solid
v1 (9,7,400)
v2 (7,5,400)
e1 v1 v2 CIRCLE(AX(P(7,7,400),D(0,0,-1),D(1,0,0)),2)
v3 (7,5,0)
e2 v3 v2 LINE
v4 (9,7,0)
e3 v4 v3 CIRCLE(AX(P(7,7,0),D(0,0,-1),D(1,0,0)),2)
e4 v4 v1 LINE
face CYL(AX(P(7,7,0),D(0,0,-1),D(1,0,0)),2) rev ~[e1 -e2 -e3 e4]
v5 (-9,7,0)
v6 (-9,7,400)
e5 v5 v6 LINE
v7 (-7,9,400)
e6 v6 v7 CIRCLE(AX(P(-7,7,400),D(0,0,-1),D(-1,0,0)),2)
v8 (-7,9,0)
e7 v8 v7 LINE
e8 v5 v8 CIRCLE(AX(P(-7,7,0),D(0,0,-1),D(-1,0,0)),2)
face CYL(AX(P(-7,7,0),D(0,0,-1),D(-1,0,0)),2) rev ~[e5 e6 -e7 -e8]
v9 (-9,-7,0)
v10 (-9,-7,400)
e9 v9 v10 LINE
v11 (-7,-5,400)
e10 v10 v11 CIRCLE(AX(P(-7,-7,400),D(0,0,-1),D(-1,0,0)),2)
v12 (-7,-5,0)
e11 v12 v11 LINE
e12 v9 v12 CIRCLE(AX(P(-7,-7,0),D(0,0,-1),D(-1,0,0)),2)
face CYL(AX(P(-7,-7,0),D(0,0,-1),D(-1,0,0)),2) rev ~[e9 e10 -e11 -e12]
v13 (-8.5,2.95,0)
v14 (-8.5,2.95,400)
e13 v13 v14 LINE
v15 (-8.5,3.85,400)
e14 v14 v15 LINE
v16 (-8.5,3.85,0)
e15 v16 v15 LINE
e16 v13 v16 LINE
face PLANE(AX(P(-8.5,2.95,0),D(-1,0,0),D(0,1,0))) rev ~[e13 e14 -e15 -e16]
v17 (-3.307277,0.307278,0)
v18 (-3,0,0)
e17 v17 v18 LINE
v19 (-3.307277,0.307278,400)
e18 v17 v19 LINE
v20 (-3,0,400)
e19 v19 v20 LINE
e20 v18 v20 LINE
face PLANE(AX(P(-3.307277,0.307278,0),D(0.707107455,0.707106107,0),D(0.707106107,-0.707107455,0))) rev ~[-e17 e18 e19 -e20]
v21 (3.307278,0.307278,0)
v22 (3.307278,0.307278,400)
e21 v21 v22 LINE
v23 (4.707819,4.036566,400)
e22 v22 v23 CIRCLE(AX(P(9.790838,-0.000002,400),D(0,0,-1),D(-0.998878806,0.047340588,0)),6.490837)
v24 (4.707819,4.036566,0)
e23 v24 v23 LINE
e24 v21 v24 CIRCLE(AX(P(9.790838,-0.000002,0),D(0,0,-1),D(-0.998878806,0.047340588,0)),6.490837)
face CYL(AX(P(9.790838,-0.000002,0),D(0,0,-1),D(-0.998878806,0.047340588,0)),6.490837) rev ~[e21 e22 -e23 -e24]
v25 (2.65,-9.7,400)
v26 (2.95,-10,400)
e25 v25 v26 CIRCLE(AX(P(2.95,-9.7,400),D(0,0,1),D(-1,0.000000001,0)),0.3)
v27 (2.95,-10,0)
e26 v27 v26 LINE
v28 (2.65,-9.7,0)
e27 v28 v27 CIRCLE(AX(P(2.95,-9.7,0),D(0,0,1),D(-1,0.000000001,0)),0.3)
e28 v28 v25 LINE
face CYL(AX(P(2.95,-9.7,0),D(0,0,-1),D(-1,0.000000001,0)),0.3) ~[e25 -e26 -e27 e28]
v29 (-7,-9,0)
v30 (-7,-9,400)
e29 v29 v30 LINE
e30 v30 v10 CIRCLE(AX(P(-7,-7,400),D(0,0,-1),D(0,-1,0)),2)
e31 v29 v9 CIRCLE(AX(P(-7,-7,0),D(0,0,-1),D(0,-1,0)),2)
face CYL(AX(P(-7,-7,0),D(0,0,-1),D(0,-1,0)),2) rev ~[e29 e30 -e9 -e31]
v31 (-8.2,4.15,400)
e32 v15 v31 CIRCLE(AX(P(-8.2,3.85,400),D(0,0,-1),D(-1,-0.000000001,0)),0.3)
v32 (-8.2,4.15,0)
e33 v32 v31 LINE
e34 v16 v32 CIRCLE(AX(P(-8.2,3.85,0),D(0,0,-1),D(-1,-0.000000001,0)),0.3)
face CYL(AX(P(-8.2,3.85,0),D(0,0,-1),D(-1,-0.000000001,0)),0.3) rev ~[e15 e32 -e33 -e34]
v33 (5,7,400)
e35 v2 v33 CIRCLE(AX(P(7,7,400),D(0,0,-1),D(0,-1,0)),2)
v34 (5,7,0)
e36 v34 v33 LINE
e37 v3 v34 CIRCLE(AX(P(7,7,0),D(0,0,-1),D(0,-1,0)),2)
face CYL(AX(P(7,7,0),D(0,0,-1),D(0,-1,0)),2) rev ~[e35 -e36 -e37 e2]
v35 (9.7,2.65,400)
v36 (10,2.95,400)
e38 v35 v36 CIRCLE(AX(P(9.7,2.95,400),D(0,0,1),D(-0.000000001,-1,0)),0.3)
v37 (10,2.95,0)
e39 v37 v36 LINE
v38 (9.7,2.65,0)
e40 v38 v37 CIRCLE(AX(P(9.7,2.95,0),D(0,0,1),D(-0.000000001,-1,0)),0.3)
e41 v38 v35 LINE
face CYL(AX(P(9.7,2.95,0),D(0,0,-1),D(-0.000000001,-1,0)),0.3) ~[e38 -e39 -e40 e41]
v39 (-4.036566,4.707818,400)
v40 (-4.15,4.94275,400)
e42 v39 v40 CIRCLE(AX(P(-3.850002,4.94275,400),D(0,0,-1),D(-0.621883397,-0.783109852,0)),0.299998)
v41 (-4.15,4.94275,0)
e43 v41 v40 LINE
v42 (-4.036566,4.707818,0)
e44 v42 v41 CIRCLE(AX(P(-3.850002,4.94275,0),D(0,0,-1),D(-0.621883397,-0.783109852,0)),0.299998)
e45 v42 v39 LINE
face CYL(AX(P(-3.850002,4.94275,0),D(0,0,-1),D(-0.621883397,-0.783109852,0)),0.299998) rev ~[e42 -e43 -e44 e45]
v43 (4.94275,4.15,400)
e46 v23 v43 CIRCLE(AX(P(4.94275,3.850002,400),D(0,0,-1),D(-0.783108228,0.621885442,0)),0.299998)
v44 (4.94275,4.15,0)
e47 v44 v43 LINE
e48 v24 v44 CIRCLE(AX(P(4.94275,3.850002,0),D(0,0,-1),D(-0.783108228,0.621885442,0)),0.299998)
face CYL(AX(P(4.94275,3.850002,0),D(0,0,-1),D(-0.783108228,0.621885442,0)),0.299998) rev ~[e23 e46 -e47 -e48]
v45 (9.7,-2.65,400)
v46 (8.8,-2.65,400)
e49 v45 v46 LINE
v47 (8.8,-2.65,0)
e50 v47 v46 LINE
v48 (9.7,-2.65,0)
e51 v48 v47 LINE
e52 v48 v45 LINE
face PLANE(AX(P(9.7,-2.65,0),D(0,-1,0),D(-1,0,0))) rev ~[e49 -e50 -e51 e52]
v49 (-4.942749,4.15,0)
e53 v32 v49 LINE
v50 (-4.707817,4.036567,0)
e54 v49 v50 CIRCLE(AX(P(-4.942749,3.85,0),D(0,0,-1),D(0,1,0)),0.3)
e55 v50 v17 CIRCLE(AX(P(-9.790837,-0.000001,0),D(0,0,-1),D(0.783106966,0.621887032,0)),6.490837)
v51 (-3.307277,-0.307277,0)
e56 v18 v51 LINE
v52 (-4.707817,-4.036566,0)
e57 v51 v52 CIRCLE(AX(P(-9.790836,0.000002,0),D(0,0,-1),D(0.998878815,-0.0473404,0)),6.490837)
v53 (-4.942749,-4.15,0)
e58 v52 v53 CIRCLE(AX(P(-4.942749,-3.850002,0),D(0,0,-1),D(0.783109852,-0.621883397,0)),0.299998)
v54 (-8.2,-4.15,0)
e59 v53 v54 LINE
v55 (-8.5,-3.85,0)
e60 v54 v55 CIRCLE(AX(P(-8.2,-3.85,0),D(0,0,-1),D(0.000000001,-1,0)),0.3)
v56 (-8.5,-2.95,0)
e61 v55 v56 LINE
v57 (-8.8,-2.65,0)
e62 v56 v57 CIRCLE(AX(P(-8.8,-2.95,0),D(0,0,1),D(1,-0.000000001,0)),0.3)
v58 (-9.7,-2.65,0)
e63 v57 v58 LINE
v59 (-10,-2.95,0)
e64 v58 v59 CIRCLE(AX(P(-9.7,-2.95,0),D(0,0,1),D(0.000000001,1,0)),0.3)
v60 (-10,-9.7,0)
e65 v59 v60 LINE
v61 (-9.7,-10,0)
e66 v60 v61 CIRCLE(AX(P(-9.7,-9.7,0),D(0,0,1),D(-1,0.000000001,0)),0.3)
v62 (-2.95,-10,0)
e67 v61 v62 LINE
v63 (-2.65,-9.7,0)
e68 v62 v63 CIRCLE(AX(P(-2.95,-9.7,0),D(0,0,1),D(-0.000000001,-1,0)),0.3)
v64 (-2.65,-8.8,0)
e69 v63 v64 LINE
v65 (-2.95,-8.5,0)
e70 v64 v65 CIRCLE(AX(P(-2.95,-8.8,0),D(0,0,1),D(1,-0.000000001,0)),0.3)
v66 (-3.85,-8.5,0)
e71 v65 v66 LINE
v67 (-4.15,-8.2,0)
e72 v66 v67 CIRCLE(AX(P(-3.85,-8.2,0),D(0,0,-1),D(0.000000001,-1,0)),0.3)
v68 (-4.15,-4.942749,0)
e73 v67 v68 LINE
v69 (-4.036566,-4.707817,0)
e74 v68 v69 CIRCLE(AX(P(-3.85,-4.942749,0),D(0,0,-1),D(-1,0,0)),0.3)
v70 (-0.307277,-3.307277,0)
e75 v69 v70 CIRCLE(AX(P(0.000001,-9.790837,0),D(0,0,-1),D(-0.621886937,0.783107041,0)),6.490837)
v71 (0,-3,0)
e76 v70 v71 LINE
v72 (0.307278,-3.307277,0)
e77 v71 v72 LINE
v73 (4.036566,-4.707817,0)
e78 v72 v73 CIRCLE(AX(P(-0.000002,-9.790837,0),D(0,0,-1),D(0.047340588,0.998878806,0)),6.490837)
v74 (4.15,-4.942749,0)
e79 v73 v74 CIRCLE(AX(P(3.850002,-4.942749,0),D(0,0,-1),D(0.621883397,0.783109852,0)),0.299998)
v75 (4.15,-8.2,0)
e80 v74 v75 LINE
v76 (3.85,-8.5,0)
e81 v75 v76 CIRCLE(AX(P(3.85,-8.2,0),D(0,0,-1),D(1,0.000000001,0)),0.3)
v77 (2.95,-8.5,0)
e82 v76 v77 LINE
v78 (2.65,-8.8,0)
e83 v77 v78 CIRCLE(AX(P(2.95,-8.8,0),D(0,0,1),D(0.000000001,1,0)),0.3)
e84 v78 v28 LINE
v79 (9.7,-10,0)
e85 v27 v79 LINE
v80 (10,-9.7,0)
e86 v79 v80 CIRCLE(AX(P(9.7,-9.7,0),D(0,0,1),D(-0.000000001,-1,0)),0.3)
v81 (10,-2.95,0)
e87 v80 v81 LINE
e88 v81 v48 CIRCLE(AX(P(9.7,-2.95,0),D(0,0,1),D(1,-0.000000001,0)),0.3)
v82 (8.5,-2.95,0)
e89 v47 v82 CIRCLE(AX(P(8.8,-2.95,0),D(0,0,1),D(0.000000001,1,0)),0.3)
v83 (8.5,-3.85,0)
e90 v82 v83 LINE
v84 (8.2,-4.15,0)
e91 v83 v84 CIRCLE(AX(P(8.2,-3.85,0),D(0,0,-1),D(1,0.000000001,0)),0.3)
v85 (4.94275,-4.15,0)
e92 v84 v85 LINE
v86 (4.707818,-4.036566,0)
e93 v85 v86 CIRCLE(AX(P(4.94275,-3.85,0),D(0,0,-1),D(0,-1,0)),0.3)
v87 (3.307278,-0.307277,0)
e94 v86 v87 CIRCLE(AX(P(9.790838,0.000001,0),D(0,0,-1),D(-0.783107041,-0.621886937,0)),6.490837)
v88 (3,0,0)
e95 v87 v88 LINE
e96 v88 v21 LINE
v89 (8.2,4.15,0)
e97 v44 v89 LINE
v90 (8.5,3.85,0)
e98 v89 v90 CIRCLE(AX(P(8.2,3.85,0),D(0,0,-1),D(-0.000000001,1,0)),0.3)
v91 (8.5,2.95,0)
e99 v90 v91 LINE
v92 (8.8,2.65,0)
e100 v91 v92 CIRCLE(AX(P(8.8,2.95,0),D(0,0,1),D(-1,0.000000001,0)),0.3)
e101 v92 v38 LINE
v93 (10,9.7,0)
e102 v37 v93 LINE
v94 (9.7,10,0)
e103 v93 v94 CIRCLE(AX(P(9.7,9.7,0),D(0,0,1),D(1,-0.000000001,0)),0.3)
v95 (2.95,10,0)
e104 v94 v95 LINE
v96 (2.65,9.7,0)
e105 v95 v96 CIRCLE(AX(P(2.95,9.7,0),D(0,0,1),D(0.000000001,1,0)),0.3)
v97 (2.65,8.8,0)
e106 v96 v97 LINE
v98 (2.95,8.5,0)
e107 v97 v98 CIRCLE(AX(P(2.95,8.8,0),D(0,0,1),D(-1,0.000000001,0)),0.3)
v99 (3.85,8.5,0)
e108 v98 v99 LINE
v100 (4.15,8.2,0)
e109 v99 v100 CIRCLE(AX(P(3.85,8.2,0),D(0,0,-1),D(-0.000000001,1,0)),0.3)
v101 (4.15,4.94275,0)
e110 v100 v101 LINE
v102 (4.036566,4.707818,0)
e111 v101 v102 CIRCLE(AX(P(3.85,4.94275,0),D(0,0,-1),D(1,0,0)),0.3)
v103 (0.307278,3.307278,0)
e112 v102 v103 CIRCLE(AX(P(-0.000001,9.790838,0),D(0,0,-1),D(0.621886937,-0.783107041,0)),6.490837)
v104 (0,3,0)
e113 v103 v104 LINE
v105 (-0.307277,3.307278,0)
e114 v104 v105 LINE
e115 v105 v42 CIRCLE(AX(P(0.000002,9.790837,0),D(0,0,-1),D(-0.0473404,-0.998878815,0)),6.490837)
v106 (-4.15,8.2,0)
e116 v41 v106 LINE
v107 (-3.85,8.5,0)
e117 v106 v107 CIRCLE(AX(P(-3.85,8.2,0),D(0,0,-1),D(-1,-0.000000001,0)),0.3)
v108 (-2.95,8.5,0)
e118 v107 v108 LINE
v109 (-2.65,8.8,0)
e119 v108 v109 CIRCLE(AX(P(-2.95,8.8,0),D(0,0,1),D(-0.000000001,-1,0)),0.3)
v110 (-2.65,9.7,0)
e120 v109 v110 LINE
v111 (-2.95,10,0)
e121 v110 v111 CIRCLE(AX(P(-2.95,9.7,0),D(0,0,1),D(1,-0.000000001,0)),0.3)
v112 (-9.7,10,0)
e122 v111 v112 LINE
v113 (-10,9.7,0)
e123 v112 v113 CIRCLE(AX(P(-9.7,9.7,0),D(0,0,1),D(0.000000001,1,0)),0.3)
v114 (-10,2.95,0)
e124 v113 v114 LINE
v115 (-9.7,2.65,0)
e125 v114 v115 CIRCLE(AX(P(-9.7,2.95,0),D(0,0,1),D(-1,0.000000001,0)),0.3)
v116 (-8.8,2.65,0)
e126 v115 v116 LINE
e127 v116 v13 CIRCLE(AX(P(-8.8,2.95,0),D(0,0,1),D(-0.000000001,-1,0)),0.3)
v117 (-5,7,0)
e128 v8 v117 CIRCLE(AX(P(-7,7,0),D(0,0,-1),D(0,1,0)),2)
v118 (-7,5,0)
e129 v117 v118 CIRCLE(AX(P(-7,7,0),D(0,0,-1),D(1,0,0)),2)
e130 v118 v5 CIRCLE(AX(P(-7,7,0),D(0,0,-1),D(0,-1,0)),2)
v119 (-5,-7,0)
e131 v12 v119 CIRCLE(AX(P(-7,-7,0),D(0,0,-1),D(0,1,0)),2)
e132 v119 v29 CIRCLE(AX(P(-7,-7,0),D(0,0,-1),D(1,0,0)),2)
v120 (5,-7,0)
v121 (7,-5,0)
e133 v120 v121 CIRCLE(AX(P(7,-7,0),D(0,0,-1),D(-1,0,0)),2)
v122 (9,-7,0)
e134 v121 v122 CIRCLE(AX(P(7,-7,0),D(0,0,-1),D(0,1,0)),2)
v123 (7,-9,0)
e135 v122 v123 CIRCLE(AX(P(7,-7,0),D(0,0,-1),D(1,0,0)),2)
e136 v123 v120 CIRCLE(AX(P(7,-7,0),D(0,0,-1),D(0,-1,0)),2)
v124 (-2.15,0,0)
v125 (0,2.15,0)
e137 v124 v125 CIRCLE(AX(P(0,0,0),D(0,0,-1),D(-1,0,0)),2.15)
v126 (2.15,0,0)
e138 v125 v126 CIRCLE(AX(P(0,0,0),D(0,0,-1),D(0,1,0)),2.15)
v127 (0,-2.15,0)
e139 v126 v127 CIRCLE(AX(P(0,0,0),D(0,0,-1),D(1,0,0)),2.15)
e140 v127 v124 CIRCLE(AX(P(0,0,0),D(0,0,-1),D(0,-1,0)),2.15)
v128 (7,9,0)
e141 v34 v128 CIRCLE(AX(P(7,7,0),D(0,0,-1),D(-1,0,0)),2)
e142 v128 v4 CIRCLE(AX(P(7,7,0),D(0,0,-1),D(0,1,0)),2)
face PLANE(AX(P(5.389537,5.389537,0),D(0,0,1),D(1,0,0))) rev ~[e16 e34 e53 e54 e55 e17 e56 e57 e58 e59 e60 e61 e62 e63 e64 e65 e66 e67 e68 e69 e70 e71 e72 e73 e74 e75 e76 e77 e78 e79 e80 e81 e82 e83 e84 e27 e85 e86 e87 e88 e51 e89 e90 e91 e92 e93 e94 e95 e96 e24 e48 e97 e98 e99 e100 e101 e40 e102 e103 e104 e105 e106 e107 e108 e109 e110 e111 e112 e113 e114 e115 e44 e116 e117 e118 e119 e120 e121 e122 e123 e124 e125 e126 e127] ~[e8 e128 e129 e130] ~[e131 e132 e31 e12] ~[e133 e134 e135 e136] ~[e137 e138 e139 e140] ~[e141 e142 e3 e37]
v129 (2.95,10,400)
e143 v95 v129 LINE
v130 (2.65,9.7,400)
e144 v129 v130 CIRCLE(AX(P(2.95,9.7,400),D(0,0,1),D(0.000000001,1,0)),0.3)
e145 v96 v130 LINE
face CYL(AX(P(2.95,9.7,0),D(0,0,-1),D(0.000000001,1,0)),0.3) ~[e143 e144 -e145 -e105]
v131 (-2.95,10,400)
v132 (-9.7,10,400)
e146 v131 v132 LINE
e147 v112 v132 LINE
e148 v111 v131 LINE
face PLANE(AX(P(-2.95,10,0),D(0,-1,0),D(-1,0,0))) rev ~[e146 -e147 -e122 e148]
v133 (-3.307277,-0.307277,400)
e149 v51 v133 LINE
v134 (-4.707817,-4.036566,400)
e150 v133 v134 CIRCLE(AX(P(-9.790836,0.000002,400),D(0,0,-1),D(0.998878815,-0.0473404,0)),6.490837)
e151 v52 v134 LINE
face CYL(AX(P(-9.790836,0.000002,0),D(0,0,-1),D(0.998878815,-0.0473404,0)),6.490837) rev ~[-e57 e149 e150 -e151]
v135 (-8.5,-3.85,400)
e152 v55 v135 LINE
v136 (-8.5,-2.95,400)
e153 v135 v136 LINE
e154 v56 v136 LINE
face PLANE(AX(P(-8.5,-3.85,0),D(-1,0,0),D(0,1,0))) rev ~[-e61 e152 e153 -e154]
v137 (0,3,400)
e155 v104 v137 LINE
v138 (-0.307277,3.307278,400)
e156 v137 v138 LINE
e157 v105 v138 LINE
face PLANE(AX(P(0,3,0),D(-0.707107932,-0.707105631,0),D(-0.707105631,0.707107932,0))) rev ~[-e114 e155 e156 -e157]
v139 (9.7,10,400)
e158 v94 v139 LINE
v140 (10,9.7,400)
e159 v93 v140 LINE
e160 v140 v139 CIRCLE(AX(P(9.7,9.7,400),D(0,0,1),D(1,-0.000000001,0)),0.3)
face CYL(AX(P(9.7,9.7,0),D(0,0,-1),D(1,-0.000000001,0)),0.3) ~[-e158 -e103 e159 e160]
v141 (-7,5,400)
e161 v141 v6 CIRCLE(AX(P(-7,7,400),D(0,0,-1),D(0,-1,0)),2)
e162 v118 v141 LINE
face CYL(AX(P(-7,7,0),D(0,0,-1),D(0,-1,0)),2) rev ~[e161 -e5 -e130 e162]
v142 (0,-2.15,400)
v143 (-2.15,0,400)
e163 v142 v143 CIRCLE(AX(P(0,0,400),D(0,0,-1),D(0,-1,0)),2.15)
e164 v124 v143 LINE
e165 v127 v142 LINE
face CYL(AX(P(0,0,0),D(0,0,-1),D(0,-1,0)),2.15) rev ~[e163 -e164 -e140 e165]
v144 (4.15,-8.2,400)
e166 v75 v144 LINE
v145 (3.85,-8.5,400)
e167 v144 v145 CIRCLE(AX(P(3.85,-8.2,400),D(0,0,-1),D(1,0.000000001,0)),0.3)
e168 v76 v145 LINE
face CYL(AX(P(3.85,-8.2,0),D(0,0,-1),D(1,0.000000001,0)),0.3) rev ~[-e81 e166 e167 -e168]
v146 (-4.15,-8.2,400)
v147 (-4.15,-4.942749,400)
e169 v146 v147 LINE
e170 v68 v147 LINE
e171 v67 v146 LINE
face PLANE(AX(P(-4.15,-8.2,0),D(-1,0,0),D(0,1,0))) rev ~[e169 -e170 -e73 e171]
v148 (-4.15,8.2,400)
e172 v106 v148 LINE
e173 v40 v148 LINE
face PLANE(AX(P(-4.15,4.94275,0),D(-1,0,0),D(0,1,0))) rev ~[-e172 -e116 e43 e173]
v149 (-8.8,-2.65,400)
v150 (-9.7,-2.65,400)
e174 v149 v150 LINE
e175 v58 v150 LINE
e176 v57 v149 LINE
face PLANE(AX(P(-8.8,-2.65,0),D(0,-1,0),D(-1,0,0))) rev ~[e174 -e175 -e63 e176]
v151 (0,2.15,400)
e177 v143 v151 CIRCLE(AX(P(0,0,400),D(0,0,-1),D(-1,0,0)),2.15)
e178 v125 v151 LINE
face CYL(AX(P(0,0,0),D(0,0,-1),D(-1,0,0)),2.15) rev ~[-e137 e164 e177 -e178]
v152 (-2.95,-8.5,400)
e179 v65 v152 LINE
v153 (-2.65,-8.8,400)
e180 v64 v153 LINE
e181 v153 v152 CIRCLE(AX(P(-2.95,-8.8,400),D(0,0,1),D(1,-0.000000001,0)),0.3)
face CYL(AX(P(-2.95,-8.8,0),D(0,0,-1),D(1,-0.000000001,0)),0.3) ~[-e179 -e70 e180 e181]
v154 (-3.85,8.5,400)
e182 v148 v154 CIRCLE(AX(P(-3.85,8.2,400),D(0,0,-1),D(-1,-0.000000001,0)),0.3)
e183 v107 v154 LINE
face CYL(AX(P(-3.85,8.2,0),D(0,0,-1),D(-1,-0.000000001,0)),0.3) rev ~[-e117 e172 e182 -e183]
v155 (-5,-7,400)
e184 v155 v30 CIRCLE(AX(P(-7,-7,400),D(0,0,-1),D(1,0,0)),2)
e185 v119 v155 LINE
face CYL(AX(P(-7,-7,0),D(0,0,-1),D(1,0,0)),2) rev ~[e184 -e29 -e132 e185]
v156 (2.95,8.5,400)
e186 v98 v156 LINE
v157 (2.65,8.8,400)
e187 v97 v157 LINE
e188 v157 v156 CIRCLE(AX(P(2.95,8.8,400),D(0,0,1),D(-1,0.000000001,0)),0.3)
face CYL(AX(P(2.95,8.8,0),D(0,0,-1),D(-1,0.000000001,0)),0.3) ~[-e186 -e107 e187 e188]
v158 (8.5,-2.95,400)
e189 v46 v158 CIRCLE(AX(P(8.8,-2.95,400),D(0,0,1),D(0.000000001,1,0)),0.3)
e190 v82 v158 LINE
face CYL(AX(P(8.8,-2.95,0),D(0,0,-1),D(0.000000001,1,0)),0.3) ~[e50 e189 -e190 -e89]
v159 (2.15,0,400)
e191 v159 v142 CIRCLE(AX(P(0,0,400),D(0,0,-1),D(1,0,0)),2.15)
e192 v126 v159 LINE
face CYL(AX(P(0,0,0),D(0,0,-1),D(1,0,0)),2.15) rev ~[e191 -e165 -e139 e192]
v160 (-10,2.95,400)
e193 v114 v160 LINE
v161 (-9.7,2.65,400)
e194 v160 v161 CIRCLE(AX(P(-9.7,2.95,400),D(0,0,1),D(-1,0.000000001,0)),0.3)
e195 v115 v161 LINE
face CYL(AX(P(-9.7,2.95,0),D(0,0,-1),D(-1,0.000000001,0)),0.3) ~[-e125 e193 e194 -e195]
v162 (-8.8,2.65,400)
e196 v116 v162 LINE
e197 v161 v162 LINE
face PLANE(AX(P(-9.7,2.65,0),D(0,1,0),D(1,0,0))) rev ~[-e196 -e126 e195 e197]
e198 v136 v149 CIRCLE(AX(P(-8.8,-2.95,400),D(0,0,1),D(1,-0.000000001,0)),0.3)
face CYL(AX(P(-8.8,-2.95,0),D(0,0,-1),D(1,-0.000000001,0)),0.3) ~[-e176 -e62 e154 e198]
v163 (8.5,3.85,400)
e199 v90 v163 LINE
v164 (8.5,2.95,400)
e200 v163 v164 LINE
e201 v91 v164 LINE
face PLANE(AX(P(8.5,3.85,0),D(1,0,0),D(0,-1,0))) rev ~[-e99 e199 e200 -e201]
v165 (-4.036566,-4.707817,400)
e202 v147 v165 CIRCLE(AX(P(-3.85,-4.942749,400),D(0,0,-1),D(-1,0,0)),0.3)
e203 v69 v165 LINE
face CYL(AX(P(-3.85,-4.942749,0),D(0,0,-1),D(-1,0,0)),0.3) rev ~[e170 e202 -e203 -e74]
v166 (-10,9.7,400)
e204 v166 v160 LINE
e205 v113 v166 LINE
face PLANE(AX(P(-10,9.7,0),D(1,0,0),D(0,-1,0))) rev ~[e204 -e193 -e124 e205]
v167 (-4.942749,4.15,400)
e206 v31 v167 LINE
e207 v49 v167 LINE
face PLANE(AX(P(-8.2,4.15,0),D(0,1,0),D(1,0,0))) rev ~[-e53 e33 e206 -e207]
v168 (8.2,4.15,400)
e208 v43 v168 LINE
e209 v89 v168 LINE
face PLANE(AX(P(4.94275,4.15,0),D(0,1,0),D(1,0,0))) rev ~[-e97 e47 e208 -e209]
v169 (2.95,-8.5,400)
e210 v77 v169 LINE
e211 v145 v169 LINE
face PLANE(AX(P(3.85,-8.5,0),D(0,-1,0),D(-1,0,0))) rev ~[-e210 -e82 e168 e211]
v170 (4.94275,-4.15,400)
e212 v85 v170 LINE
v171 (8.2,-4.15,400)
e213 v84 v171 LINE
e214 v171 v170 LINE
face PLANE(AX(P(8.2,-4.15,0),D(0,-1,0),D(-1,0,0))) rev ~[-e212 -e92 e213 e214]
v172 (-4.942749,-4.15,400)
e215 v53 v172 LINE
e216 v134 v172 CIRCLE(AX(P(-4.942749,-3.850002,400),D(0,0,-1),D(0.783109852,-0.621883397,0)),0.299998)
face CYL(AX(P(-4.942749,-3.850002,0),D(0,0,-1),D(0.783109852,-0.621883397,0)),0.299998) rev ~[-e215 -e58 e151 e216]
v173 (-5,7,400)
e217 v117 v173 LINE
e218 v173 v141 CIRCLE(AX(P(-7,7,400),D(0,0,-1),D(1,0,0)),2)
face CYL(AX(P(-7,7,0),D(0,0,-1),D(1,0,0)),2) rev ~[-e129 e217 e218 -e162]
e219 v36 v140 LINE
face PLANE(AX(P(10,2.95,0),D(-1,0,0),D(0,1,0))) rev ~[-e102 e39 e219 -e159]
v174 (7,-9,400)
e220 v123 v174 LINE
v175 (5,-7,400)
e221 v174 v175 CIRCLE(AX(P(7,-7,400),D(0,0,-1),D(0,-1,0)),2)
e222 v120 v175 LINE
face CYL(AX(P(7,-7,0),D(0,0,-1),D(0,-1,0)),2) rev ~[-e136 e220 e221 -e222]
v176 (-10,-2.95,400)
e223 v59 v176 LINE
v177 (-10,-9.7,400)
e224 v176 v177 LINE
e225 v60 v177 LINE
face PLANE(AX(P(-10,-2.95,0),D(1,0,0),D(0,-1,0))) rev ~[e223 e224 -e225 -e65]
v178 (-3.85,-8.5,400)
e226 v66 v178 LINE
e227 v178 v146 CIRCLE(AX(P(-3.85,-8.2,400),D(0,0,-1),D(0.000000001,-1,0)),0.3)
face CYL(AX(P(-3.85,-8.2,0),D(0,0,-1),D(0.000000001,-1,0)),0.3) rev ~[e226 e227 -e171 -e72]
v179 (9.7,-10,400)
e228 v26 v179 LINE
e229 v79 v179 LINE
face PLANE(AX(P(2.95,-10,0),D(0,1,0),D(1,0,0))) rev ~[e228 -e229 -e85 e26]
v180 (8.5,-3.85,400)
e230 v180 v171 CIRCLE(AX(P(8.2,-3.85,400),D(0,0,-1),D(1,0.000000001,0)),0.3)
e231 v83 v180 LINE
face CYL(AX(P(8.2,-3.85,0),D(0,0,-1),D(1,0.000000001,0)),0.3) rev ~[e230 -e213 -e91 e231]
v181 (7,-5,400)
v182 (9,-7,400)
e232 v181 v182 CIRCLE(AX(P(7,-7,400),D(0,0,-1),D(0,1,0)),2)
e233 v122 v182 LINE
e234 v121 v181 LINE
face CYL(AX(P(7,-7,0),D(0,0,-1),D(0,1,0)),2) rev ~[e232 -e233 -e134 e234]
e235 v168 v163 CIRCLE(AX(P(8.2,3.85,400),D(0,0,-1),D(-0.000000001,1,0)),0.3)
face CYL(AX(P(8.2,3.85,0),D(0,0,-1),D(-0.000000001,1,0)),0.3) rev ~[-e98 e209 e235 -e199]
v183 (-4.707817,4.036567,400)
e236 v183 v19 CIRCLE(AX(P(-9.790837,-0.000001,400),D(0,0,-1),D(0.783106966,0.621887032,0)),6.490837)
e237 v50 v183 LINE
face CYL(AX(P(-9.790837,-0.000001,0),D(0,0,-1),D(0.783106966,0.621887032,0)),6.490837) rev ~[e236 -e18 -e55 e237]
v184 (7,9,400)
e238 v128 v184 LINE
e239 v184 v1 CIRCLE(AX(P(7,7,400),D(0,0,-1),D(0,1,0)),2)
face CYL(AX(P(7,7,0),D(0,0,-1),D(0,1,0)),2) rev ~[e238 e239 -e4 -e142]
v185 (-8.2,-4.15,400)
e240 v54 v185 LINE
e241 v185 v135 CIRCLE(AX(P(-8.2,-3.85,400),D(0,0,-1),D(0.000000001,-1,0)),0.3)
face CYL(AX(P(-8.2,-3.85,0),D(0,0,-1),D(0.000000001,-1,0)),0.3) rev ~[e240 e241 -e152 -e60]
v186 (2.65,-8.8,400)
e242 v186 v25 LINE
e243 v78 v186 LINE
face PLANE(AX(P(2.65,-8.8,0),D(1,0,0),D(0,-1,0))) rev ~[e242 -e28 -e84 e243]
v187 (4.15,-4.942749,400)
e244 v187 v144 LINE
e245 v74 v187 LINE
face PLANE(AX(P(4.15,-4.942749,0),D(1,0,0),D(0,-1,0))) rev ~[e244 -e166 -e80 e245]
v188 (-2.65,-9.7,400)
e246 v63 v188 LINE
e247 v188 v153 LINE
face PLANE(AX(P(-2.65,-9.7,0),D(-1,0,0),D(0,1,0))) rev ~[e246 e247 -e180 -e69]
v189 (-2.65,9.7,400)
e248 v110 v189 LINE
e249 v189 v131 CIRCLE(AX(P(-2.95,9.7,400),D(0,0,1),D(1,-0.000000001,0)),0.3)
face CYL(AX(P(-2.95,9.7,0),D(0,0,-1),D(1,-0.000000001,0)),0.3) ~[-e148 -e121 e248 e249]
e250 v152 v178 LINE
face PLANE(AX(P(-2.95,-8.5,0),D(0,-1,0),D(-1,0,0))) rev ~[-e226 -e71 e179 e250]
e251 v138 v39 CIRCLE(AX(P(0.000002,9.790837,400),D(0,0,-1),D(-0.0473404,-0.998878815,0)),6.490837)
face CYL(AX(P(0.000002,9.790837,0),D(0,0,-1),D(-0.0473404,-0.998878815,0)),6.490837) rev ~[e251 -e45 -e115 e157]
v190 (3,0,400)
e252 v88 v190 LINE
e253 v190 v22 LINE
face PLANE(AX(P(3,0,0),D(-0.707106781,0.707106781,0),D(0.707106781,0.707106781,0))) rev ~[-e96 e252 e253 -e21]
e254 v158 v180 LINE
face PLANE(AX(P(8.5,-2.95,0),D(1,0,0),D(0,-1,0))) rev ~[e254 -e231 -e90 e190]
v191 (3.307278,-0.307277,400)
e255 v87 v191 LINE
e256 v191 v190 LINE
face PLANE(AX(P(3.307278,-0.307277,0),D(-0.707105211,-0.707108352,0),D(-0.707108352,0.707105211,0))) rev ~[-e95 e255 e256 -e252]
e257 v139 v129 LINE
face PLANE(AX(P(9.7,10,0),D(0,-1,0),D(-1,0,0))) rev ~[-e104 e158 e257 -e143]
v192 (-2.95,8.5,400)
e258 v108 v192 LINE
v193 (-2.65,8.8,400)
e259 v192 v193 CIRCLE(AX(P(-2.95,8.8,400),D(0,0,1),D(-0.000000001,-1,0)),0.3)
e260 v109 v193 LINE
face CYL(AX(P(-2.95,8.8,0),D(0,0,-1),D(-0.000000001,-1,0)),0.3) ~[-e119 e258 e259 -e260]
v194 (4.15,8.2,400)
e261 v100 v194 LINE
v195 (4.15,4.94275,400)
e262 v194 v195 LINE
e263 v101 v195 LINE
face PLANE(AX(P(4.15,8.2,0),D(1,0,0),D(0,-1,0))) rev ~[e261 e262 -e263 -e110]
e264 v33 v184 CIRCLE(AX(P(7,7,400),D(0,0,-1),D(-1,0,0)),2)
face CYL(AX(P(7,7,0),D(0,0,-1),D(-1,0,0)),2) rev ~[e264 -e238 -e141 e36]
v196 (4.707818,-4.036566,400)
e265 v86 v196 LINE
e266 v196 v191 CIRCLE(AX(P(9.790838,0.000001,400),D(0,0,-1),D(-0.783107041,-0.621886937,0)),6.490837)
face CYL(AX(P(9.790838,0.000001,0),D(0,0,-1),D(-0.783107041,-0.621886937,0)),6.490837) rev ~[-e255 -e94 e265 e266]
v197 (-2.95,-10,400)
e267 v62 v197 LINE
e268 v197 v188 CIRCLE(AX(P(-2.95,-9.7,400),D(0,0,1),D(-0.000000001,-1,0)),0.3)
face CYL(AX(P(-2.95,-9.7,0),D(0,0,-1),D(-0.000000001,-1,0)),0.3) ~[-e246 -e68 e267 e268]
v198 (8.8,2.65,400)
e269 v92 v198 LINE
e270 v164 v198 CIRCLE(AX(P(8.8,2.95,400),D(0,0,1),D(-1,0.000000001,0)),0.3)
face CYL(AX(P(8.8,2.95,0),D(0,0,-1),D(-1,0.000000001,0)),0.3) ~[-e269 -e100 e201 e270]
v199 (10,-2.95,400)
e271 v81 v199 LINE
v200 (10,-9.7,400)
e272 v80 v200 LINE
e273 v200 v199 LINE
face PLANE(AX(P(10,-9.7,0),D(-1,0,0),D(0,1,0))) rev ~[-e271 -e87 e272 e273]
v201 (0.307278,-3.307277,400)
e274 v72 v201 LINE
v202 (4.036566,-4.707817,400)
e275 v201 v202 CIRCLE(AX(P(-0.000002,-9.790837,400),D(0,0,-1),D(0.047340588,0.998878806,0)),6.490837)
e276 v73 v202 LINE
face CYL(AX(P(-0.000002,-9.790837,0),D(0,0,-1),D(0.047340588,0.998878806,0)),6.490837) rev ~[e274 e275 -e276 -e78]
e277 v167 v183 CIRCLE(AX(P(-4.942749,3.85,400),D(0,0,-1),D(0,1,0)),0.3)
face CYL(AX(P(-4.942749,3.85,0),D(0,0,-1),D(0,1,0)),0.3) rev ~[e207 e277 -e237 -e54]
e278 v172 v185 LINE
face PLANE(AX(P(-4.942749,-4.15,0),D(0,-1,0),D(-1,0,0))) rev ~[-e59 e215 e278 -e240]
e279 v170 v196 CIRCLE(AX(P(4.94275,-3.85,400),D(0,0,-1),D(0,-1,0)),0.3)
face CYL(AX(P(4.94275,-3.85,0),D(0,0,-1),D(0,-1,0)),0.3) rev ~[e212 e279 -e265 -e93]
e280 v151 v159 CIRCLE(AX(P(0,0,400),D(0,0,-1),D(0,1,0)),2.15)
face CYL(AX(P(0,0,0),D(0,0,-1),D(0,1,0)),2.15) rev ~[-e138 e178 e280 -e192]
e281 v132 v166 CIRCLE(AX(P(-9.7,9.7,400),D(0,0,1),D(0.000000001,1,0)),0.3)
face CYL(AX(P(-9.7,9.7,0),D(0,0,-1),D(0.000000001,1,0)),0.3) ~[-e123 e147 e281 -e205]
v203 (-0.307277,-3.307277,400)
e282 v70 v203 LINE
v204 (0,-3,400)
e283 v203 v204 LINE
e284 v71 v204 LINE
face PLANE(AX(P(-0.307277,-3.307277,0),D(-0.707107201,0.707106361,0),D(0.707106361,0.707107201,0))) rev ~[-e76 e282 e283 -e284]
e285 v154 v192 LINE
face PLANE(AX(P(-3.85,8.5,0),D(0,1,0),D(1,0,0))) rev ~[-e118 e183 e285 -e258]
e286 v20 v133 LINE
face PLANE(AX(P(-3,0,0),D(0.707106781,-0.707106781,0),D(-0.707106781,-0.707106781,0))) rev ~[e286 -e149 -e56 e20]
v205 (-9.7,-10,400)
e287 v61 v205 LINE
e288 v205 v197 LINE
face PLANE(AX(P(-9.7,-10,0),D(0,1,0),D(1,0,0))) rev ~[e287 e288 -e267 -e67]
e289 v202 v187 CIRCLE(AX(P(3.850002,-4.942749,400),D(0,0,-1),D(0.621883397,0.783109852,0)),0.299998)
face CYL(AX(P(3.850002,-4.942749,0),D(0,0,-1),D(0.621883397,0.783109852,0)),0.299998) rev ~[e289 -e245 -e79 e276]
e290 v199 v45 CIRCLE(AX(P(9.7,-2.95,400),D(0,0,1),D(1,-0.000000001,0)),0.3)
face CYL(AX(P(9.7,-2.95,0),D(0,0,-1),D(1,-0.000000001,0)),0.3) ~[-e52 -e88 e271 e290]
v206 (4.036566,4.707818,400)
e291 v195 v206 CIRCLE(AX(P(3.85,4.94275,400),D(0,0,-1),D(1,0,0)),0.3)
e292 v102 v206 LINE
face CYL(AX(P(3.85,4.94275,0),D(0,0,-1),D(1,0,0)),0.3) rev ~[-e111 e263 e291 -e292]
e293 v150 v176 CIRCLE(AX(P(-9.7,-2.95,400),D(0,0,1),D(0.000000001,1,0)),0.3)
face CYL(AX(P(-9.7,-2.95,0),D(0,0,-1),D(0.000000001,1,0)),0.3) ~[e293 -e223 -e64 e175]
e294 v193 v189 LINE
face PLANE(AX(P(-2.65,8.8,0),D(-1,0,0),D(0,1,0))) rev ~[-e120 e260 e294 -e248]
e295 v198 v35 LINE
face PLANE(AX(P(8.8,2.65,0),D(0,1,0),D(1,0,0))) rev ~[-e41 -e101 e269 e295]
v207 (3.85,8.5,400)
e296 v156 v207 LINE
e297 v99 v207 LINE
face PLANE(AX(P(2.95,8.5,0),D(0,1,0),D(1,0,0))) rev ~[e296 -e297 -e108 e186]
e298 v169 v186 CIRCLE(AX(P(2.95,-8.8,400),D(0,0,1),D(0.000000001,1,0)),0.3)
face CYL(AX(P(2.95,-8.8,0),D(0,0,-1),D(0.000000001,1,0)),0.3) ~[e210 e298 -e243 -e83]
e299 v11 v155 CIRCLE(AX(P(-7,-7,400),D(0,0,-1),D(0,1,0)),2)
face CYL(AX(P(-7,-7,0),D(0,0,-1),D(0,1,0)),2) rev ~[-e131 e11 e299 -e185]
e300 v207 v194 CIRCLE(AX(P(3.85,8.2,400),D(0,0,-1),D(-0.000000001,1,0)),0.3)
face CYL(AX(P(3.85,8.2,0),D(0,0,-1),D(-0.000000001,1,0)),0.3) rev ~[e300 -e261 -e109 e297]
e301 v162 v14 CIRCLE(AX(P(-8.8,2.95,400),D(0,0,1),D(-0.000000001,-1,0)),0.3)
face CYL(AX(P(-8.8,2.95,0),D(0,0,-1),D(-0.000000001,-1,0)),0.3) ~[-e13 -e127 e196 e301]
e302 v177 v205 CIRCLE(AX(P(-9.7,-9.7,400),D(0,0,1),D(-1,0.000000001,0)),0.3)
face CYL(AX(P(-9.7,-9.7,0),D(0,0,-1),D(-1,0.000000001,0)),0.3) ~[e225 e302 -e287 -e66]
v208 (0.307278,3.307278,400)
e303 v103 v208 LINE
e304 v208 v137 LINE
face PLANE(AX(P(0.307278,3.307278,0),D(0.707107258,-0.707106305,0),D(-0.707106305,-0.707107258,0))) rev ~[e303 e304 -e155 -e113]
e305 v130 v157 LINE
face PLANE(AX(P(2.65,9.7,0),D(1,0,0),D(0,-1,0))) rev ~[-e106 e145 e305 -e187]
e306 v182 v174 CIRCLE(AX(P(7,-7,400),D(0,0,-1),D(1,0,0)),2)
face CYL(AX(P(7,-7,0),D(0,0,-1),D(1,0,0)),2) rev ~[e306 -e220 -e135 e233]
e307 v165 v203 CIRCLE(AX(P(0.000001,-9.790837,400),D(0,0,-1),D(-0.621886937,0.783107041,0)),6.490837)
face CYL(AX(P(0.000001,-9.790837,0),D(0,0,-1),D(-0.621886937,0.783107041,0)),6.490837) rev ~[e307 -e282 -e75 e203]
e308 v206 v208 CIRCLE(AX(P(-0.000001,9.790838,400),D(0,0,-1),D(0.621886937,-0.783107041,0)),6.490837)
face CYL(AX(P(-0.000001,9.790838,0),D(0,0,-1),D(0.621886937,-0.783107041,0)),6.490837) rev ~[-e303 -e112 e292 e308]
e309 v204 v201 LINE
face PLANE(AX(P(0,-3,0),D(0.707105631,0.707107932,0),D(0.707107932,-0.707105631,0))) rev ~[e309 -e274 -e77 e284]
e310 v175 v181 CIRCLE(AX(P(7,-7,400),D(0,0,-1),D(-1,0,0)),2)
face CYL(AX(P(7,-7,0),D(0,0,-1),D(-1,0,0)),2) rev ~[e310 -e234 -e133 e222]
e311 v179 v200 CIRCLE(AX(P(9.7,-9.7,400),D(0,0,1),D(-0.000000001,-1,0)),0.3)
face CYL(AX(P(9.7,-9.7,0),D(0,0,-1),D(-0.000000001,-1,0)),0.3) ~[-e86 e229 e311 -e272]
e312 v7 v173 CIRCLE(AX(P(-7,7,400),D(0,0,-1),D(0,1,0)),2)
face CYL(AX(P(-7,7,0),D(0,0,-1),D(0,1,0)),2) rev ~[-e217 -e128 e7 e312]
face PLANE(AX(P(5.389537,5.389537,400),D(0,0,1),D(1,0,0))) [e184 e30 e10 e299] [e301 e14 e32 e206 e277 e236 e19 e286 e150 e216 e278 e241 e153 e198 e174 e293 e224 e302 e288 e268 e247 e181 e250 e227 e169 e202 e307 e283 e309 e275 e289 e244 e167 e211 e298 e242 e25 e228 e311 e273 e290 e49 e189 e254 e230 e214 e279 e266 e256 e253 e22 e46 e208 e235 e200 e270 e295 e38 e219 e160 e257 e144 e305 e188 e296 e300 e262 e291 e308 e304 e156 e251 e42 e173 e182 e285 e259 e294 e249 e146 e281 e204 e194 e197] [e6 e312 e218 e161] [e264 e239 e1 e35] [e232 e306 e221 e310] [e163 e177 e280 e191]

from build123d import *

# Parameters (mm, degrees)
F1_DEPTH = 400


# Not quite as in the source:
# - ends of sketch curves that miss each other by under 0.0002 mm in the source are joined


with BuildPart() as f1:
    # F0 (on Top) → F1 (new body)
    with BuildSketch(Plane.XY):
        with BuildLine():
            ThreePointArc((0, 2.15), (1.5202795796, 1.5202795796), (2.15, 0))
            Line((2.15, 0), (3, 0))
            Line((3, 0), (3.307278, 0.307278))
            ThreePointArc((3.307278, 0.307278), (3.7143803747, 2.2820219924), (4.7078187099, 4.0365664363))
            ThreePointArc((4.7078187099, 4.0365664363), (4.812308461, 4.1201573706), (4.94275, 4.15))
            Line((4.94275, 4.15), (8.2, 4.15))
            ThreePointArc((8.2, 4.15), (8.4121320344, 4.0621320344), (8.5, 3.85))
            Line((8.5, 3.85), (8.5, 2.95))
            ThreePointArc((8.5, 2.95), (8.5878679656, 2.7378679656), (8.8, 2.65))
            Line((8.8, 2.65), (9.7, 2.65))
            ThreePointArc((9.7, 2.65), (9.9121320344, 2.7378679656), (10, 2.95))
            Line((10, 2.95), (10, 9.7))
            ThreePointArc((10, 9.7), (9.9121320344, 9.9121320344), (9.7, 10))
            Line((9.7, 10), (2.95, 10))
            ThreePointArc((2.95, 10), (2.7378679656, 9.9121320344), (2.65, 9.7))
            Line((2.65, 9.7), (2.65, 8.8))
            ThreePointArc((2.65, 8.8), (2.7378679656, 8.5878679656), (2.95, 8.5))
            Line((2.95, 8.5), (3.85, 8.5))
            ThreePointArc((3.85, 8.5), (4.0621320344, 8.4121320344), (4.15, 8.2))
            Line((4.15, 8.2), (4.15, 4.94275))
            ThreePointArc((4.15, 4.94275), (4.1201572004, 4.8123081084), (4.036566086, 4.7078178916))
            ThreePointArc((4.036566086, 4.7078178916), (2.2820216259, 3.7143802371), (0.3072779813, 3.3072783955))
            Line((0.3072779813, 3.3072783955), (0, 3))
            Line((0, 3), (0, 2.15))
        make_face()
        with BuildLine():
            ThreePointArc((7, 9), (8.4142135624, 8.4142135624), (9, 7))
            ThreePointArc((9, 7), (8.4142135624, 5.5857864376), (7, 5))
            ThreePointArc((7, 5), (5.5857864376, 5.5857864376), (5, 7))
            ThreePointArc((5, 7), (5.5857864376, 8.4142135624), (7, 9))
        make_face(mode=Mode.SUBTRACT)
        with BuildLine():
            Line((3, 0), (2.15, 0))
            ThreePointArc((2.15, 0), (1.5202795796, -1.5202795796), (0, -2.15))
            Line((0, -2.15), (0, -3))
            Line((0, -3), (0.307278, -3.307277))
            ThreePointArc((0.307278, -3.307277), (2.2820216259, -3.7143792371), (4.036565823, -4.7078172229))
            ThreePointArc((4.036565823, -4.7078172229), (4.1201572004, -4.8123071084), (4.15, -4.942749))
            Line((4.15, -4.942749), (4.15, -8.2))
            ThreePointArc((4.15, -8.2), (4.0621320344, -8.4121320344), (3.85, -8.5))
            Line((3.85, -8.5), (2.95, -8.5))
            ThreePointArc((2.95, -8.5), (2.7378679656, -8.5878679656), (2.65, -8.8))
            Line((2.65, -8.8), (2.65, -9.7))
            ThreePointArc((2.65, -9.7), (2.7378679656, -9.9121320344), (2.95, -10))
            Line((2.95, -10), (9.7, -10))
            ThreePointArc((9.7, -10), (9.9121320344, -9.9121320344), (10, -9.7))
            Line((10, -9.7), (10, -2.95))
            ThreePointArc((10, -2.95), (9.9121320344, -2.7378679656), (9.7, -2.65))
            Line((9.7, -2.65), (8.8, -2.65))
            ThreePointArc((8.8, -2.65), (8.5878679656, -2.7378679656), (8.5, -2.95))
            Line((8.5, -2.95), (8.5, -3.85))
            ThreePointArc((8.5, -3.85), (8.4121320344, -4.0621320344), (8.2, -4.15))
            Line((8.2, -4.15), (4.94275, -4.15))
            ThreePointArc((4.94275, -4.15), (4.8123081084, -4.1201572004), (4.7078178916, -4.036566086))
            ThreePointArc((4.7078178916, -4.036566086), (3.7143800615, -2.2820211583), (3.3072783483, -0.3072769835))
            Line((3.3072783483, -0.3072769835), (3, 0))
        make_face()
        with BuildLine():
            ThreePointArc((7, -5), (8.4142135624, -5.5857864376), (9, -7))
            ThreePointArc((9, -7), (8.4142135624, -8.4142135624), (7, -9))
            ThreePointArc((7, -9), (5.5857864376, -8.4142135624), (5, -7))
            ThreePointArc((5, -7), (5.5857864376, -5.5857864376), (7, -5))
        make_face(mode=Mode.SUBTRACT)
        with BuildLine():
            Line((0, -3), (0, -2.15))
            ThreePointArc((0, -2.15), (-1.5202795796, -1.5202795796), (-2.15, 0))
            Line((-2.15, 0), (-3, 0))
            Line((-3, 0), (-3.307277, -0.307277))
            ThreePointArc((-3.307277, -0.307277), (-3.7143790615, -2.2820211583), (-4.7078172229, -4.036565823))
            ThreePointArc((-4.7078172229, -4.036565823), (-4.8123071084, -4.1201572004), (-4.942749, -4.15))
            Line((-4.942749, -4.15), (-8.2, -4.15))
            ThreePointArc((-8.2, -4.15), (-8.4121320344, -4.0621320344), (-8.5, -3.85))
            Line((-8.5, -3.85), (-8.5, -2.95))
            ThreePointArc((-8.5, -2.95), (-8.5878679656, -2.7378679656), (-8.8, -2.65))
            Line((-8.8, -2.65), (-9.7, -2.65))
            ThreePointArc((-9.7, -2.65), (-9.9121320344, -2.7378679656), (-10, -2.95))
            Line((-10, -2.95), (-10, -9.7))
            ThreePointArc((-10, -9.7), (-9.9121320344, -9.9121320344), (-9.7, -10))
            Line((-9.7, -10), (-2.95, -10))
            ThreePointArc((-2.95, -10), (-2.7378679656, -9.9121320344), (-2.65, -9.7))
            Line((-2.65, -9.7), (-2.65, -8.8))
            ThreePointArc((-2.65, -8.8), (-2.7378679656, -8.5878679656), (-2.95, -8.5))
            Line((-2.95, -8.5), (-3.85, -8.5))
            ThreePointArc((-3.85, -8.5), (-4.0621320344, -8.4121320344), (-4.15, -8.2))
            Line((-4.15, -8.2), (-4.15, -4.942749))
            ThreePointArc((-4.15, -4.942749), (-4.1201572004, -4.8123071084), (-4.036566086, -4.7078168916))
            ThreePointArc((-4.036566086, -4.7078168916), (-2.2820211583, -3.7143790615), (-0.3072769835, -3.3072773483))
            Line((-0.3072769835, -3.3072773483), (0, -3))
        make_face()
        with BuildLine():
            ThreePointArc((-7, -9), (-8.4142135624, -8.4142135624), (-9, -7))
            ThreePointArc((-9, -7), (-8.4142135624, -5.5857864376), (-7, -5))
            ThreePointArc((-7, -5), (-5.5857864376, -5.5857864376), (-5, -7))
            ThreePointArc((-5, -7), (-5.5857864376, -8.4142135624), (-7, -9))
        make_face(mode=Mode.SUBTRACT)
        with BuildLine():
            ThreePointArc((-2.15, 0), (-1.5202795796, 1.5202795796), (0, 2.15))
            Line((0, 2.15), (0, 3))
            Line((0, 3), (-0.307277, 3.307278))
            ThreePointArc((-0.307277, 3.307278), (-2.2820211583, 3.7143800615), (-4.036565823, 4.7078182229))
            ThreePointArc((-4.036565823, 4.7078182229), (-4.1201572004, 4.8123081084), (-4.15, 4.94275))
            Line((-4.15, 4.94275), (-4.15, 8.2))
            ThreePointArc((-4.15, 8.2), (-4.0621320344, 8.4121320344), (-3.85, 8.5))
            Line((-3.85, 8.5), (-2.95, 8.5))
            ThreePointArc((-2.95, 8.5), (-2.7378679656, 8.5878679656), (-2.65, 8.8))
            Line((-2.65, 8.8), (-2.65, 9.7))
            ThreePointArc((-2.65, 9.7), (-2.7378679656, 9.9121320344), (-2.95, 10))
            Line((-2.95, 10), (-9.7, 10))
            ThreePointArc((-9.7, 10), (-9.9121320344, 9.9121320344), (-10, 9.7))
            Line((-10, 9.7), (-10, 2.95))
            ThreePointArc((-10, 2.95), (-9.9121320344, 2.7378679656), (-9.7, 2.65))
            Line((-9.7, 2.65), (-8.8, 2.65))
            ThreePointArc((-8.8, 2.65), (-8.5878679656, 2.7378679656), (-8.5, 2.95))
            Line((-8.5, 2.95), (-8.5, 3.85))
            ThreePointArc((-8.5, 3.85), (-8.4121320344, 4.0621320344), (-8.2, 4.15))
            Line((-8.2, 4.15), (-4.942749, 4.15))
            ThreePointArc((-4.942749, 4.15), (-4.812307461, 4.1201573706), (-4.7078173786, 4.0365666993))
            ThreePointArc((-4.7078173786, 4.0365666993), (-3.7143793747, 2.2820219924), (-3.3072773955, 0.3072779813))
            Line((-3.3072773955, 0.3072779813), (-3, 0))
            Line((-3, 0), (-2.15, 0))
        make_face()
        with BuildLine():
            ThreePointArc((-7, 5), (-8.4142135624, 5.5857864376), (-9, 7))
            ThreePointArc((-9, 7), (-8.4142135624, 8.4142135624), (-7, 9))
            ThreePointArc((-7, 9), (-5.5857864376, 8.4142135624), (-5, 7))
            ThreePointArc((-5, 7), (-5.5857864376, 5.5857864376), (-7, 5))
        make_face(mode=Mode.SUBTRACT)
    extrude(amount=F1_DEPTH)


solid = f1.part
